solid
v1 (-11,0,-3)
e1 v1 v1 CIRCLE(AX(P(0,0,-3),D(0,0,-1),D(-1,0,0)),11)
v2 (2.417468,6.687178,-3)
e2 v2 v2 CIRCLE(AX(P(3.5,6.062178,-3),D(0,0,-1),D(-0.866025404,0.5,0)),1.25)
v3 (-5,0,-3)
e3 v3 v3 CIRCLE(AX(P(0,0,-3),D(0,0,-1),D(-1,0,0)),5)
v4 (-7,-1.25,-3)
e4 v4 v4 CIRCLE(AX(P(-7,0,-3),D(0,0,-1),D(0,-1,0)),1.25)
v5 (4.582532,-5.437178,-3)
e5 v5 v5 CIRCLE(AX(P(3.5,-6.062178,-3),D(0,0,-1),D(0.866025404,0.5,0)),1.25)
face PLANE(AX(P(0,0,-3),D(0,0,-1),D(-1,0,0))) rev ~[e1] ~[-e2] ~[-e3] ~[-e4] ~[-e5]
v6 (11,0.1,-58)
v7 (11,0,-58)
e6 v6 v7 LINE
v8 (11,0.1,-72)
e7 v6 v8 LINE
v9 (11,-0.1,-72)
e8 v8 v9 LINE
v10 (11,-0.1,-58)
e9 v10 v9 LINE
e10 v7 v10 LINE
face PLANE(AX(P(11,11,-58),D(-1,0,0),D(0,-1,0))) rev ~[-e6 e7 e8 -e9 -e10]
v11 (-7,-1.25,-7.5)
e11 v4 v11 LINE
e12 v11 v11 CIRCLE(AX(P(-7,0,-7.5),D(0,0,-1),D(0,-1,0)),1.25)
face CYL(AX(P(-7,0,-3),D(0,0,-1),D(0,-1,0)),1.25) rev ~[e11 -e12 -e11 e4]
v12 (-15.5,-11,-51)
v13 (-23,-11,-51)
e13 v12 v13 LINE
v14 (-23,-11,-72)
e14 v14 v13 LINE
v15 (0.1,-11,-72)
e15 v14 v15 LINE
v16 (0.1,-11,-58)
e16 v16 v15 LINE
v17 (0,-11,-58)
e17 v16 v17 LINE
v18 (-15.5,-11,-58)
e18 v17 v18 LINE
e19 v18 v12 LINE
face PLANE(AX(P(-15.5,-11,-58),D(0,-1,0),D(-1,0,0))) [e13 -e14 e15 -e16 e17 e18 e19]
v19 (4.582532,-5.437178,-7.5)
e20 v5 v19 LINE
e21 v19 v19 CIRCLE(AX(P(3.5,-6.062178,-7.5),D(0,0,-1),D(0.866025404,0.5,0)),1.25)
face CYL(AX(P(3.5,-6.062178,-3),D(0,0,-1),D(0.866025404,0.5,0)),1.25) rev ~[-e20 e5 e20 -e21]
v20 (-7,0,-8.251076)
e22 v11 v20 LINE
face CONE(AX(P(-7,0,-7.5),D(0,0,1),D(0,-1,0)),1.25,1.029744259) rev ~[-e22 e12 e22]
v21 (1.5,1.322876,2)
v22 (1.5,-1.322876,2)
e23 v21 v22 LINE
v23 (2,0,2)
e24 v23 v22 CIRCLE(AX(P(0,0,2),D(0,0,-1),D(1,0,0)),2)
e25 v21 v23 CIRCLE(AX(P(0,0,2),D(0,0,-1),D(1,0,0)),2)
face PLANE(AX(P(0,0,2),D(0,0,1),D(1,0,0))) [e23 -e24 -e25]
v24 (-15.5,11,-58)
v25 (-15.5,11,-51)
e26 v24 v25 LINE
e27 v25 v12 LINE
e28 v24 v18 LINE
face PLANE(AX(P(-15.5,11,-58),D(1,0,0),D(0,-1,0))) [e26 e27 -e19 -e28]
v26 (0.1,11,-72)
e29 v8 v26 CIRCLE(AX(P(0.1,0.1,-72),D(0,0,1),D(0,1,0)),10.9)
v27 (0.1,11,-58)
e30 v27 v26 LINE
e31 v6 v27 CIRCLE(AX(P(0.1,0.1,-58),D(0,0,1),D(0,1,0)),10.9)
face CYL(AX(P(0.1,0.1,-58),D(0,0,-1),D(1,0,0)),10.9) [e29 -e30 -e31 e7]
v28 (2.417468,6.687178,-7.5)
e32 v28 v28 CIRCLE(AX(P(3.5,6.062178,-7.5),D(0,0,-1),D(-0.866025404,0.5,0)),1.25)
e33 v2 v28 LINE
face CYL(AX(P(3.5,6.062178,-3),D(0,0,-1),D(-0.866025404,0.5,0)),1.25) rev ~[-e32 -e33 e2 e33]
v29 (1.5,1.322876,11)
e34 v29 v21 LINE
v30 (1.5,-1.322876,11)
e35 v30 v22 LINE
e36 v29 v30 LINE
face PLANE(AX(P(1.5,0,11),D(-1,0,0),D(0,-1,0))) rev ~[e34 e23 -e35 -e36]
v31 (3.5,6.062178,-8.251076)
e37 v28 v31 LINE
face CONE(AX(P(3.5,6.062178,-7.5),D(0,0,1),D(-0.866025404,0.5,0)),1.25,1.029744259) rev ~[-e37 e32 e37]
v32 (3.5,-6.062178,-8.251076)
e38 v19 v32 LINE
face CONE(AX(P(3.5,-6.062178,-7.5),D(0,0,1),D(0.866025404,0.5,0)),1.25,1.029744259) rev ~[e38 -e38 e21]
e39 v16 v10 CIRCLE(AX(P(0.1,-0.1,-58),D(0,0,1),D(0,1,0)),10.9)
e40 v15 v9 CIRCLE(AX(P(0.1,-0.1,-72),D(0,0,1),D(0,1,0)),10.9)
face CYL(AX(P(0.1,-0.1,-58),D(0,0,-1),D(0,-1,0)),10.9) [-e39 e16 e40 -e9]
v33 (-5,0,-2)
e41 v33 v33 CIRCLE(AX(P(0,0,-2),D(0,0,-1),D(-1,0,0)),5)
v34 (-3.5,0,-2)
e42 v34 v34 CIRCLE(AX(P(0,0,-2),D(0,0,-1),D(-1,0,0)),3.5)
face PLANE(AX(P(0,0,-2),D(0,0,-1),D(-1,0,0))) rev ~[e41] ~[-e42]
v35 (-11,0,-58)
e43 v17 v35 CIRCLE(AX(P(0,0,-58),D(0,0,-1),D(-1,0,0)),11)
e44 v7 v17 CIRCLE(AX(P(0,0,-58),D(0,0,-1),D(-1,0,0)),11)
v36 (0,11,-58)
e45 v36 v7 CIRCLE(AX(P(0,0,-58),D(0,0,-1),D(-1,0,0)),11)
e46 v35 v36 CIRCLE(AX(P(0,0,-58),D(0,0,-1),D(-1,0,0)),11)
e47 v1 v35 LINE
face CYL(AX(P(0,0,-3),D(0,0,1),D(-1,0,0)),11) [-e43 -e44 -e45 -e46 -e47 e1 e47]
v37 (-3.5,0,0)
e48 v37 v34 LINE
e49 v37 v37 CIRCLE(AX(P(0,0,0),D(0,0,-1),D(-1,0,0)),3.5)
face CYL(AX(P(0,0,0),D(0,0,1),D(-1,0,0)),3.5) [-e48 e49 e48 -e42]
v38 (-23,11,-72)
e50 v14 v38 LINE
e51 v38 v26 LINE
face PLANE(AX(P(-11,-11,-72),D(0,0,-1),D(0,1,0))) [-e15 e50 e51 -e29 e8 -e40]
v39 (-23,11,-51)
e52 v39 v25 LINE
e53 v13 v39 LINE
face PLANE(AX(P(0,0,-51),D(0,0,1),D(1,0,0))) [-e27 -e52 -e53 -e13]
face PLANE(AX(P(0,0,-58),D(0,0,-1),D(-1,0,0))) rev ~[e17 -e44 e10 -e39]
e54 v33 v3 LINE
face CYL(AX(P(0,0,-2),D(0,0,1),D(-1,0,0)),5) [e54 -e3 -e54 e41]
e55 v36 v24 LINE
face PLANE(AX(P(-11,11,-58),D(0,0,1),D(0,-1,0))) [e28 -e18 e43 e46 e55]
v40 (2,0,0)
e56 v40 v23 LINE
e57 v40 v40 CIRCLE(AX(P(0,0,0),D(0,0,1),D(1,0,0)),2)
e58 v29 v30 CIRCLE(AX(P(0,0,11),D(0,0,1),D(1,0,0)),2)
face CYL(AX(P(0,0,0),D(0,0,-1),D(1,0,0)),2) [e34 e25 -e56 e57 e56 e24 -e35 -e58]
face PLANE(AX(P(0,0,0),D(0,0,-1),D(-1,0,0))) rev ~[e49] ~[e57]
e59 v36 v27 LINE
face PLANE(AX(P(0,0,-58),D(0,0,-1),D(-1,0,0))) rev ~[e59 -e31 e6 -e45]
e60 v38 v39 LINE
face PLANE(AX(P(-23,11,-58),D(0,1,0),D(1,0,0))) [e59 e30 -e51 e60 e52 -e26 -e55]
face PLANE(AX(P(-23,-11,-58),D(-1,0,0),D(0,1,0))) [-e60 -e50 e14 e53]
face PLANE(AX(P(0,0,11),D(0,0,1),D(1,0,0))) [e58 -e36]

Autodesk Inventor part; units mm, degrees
ref_plane "YZ Plane" through (0, 0, 0) normal (1, 0, 0) x (0, 1, 0)
ref_plane "XZ Plane" through (0, 0, 0) normal (0, 1, 0) x (-1, 0, 0)
ref_plane "XY Plane" through (0, 0, 0) normal (0, 0, 1) x (1, 0, 0)
sketch "スケッチ1" plane through (0, 0, 0) normal (0, 0, 1) x (1, 0, 0)
  circle A0 centre (0, 0) radius 2
  dimension "d0" = 4
extrude "押し出し1" add sketch "スケッチ1" along normal blind 11
sketch "スケッチ4" plane through (0, 0, 11) normal (0, 0, 1) x (1, 0, 0)
  line L0 (2, 0) -> (1.5, 0)
  line L1 (1.5, 0) -> (1.5, -1.5356)
  line L2 (1.5, -1.5356) -> (2, -1.5356)
  line L3 (2, -1.5356) -> (2, 0)
  point P0 (0, 0)
  dimension "d6" = 0.5
extrude "押し出し3" cut sketch "スケッチ4" against normal blind 9
sketch "スケッチ5" plane through (0, 0, 11) normal (0, 0, 1) x (1, 0, 0)
  circle A0 centre (0, 0) radius 2 projected
  line L0 (2, 0) -> (1.5, 0)
  line L1 (1.5, 0) -> (1.5, 4.3078)
  line L2 (1.5, 4.3078) -> (2, 4.3078)
  line L3 (2, 4.3078) -> (2, 0)
  dimension "d9" = 0.5
extrude "押し出し4" cut sketch "スケッチ5" against normal blind 9 contours L0 L1 A0 | A0 L1 L2 L3 picked at (1.5908, 0.7499)
sketch "スケッチ6" plane through (0, 0, 0) normal (0, 0, -1) x (-1, 0, 0)
  circle A0 centre (0, 0) radius 3.5
  dimension "d12" = 7
extrude "押し出し5" add sketch "スケッチ6" along normal blind 2
sketch "スケッチ7" plane through (0, 0, -2) normal (0, 0, -1) x (-1, 0, 0)
  circle A0 centre (0, 0) radius 5
  dimension "d15" = 10
extrude "押し出し6" add sketch "スケッチ7" along normal blind 1
sketch "スケッチ8" plane through (0, 0, -3) normal (0, 0, -1) x (-1, 0, 0)
  circle A0 centre (0, 0) radius 11
  dimension "d18" = 22
extrude "押し出し7" add sketch "スケッチ8" along normal blind 55
sketch "スケッチ10" plane through (0, 0, -58) normal (0, 0, -1) x (-1, 0, 0)
  line L0 (11, 11) -> (-11, 11)
  line L1 (-11, 11) -> (-11, -11)
  line L2 (-11, -11) -> (11, -11)
  line L3 (11, -11) -> (11, 11)
  line L4 (11, 11) -> (-11, -11) construction
  line L5 (-11, 11) -> (11, -11) construction
  point P0 (0, 0)
  dimension "d21" = 22
  dimension "d22" = 22
extrude "押し出し8" add sketch "スケッチ10" along normal blind 14
fillet "フィレット1" radius 10.9 1 edges at (11, -11, -65)
fillet "フィレット2" radius 10.9 1 edges at (11, 11, -65)
sketch "スケッチ13" plane through (-11, -11, -58) normal (-1, 0, 0) x (0, 0, 1)
  line L0 (0, 0) -> (-14, 0)
  line L1 (-14, 0) -> (-14, 22)
  line L2 (-14, 22) -> (0, 22)
  line L3 (0, 22) -> (0, 0)
  point P0 (58, 11)
  dimension "d27" = 14
  dimension "d28" = 22
extrude "押し出し9" add sketch "スケッチ13" along normal blind 12
sketch "スケッチ14" plane through (0, 0, -58) normal (0, 0, 1) x (1, 0, 0)
  line L0 (-23, 11) -> (-15.5, 11)
  line L1 (-15.5, 11) -> (-15.5, -11)
  line L2 (-15.5, -11) -> (-23, -11)
  line L3 (-23, -11) -> (-23, 11)
  point P0 (0, 0)
  dimension "d31" = 7.5
  dimension "d32" = 22
extrude "押し出し10" add sketch "スケッチ14" along normal blind 7
sketch "スケッチ16" plane through (0, 0, -3) normal (0, 0, 1) x (1, 0, 0)
  point P0 (0, 0)
  point P1 (-7, 0)
  dimension "d49" = 7
  dimension "d50" = 0
hole "穴1" at (-7, 0, -3) direction (0, 0, -1) diameter 2.5 depth 4.5 tip angle 118
pattern_circular "円形状パターン2" count 3 over 360 about axis through (0, 0, 0) along (0, 0, 1) of "穴1"
properties part number "maxon_A-max22_110160" material "PVC、軟質"
